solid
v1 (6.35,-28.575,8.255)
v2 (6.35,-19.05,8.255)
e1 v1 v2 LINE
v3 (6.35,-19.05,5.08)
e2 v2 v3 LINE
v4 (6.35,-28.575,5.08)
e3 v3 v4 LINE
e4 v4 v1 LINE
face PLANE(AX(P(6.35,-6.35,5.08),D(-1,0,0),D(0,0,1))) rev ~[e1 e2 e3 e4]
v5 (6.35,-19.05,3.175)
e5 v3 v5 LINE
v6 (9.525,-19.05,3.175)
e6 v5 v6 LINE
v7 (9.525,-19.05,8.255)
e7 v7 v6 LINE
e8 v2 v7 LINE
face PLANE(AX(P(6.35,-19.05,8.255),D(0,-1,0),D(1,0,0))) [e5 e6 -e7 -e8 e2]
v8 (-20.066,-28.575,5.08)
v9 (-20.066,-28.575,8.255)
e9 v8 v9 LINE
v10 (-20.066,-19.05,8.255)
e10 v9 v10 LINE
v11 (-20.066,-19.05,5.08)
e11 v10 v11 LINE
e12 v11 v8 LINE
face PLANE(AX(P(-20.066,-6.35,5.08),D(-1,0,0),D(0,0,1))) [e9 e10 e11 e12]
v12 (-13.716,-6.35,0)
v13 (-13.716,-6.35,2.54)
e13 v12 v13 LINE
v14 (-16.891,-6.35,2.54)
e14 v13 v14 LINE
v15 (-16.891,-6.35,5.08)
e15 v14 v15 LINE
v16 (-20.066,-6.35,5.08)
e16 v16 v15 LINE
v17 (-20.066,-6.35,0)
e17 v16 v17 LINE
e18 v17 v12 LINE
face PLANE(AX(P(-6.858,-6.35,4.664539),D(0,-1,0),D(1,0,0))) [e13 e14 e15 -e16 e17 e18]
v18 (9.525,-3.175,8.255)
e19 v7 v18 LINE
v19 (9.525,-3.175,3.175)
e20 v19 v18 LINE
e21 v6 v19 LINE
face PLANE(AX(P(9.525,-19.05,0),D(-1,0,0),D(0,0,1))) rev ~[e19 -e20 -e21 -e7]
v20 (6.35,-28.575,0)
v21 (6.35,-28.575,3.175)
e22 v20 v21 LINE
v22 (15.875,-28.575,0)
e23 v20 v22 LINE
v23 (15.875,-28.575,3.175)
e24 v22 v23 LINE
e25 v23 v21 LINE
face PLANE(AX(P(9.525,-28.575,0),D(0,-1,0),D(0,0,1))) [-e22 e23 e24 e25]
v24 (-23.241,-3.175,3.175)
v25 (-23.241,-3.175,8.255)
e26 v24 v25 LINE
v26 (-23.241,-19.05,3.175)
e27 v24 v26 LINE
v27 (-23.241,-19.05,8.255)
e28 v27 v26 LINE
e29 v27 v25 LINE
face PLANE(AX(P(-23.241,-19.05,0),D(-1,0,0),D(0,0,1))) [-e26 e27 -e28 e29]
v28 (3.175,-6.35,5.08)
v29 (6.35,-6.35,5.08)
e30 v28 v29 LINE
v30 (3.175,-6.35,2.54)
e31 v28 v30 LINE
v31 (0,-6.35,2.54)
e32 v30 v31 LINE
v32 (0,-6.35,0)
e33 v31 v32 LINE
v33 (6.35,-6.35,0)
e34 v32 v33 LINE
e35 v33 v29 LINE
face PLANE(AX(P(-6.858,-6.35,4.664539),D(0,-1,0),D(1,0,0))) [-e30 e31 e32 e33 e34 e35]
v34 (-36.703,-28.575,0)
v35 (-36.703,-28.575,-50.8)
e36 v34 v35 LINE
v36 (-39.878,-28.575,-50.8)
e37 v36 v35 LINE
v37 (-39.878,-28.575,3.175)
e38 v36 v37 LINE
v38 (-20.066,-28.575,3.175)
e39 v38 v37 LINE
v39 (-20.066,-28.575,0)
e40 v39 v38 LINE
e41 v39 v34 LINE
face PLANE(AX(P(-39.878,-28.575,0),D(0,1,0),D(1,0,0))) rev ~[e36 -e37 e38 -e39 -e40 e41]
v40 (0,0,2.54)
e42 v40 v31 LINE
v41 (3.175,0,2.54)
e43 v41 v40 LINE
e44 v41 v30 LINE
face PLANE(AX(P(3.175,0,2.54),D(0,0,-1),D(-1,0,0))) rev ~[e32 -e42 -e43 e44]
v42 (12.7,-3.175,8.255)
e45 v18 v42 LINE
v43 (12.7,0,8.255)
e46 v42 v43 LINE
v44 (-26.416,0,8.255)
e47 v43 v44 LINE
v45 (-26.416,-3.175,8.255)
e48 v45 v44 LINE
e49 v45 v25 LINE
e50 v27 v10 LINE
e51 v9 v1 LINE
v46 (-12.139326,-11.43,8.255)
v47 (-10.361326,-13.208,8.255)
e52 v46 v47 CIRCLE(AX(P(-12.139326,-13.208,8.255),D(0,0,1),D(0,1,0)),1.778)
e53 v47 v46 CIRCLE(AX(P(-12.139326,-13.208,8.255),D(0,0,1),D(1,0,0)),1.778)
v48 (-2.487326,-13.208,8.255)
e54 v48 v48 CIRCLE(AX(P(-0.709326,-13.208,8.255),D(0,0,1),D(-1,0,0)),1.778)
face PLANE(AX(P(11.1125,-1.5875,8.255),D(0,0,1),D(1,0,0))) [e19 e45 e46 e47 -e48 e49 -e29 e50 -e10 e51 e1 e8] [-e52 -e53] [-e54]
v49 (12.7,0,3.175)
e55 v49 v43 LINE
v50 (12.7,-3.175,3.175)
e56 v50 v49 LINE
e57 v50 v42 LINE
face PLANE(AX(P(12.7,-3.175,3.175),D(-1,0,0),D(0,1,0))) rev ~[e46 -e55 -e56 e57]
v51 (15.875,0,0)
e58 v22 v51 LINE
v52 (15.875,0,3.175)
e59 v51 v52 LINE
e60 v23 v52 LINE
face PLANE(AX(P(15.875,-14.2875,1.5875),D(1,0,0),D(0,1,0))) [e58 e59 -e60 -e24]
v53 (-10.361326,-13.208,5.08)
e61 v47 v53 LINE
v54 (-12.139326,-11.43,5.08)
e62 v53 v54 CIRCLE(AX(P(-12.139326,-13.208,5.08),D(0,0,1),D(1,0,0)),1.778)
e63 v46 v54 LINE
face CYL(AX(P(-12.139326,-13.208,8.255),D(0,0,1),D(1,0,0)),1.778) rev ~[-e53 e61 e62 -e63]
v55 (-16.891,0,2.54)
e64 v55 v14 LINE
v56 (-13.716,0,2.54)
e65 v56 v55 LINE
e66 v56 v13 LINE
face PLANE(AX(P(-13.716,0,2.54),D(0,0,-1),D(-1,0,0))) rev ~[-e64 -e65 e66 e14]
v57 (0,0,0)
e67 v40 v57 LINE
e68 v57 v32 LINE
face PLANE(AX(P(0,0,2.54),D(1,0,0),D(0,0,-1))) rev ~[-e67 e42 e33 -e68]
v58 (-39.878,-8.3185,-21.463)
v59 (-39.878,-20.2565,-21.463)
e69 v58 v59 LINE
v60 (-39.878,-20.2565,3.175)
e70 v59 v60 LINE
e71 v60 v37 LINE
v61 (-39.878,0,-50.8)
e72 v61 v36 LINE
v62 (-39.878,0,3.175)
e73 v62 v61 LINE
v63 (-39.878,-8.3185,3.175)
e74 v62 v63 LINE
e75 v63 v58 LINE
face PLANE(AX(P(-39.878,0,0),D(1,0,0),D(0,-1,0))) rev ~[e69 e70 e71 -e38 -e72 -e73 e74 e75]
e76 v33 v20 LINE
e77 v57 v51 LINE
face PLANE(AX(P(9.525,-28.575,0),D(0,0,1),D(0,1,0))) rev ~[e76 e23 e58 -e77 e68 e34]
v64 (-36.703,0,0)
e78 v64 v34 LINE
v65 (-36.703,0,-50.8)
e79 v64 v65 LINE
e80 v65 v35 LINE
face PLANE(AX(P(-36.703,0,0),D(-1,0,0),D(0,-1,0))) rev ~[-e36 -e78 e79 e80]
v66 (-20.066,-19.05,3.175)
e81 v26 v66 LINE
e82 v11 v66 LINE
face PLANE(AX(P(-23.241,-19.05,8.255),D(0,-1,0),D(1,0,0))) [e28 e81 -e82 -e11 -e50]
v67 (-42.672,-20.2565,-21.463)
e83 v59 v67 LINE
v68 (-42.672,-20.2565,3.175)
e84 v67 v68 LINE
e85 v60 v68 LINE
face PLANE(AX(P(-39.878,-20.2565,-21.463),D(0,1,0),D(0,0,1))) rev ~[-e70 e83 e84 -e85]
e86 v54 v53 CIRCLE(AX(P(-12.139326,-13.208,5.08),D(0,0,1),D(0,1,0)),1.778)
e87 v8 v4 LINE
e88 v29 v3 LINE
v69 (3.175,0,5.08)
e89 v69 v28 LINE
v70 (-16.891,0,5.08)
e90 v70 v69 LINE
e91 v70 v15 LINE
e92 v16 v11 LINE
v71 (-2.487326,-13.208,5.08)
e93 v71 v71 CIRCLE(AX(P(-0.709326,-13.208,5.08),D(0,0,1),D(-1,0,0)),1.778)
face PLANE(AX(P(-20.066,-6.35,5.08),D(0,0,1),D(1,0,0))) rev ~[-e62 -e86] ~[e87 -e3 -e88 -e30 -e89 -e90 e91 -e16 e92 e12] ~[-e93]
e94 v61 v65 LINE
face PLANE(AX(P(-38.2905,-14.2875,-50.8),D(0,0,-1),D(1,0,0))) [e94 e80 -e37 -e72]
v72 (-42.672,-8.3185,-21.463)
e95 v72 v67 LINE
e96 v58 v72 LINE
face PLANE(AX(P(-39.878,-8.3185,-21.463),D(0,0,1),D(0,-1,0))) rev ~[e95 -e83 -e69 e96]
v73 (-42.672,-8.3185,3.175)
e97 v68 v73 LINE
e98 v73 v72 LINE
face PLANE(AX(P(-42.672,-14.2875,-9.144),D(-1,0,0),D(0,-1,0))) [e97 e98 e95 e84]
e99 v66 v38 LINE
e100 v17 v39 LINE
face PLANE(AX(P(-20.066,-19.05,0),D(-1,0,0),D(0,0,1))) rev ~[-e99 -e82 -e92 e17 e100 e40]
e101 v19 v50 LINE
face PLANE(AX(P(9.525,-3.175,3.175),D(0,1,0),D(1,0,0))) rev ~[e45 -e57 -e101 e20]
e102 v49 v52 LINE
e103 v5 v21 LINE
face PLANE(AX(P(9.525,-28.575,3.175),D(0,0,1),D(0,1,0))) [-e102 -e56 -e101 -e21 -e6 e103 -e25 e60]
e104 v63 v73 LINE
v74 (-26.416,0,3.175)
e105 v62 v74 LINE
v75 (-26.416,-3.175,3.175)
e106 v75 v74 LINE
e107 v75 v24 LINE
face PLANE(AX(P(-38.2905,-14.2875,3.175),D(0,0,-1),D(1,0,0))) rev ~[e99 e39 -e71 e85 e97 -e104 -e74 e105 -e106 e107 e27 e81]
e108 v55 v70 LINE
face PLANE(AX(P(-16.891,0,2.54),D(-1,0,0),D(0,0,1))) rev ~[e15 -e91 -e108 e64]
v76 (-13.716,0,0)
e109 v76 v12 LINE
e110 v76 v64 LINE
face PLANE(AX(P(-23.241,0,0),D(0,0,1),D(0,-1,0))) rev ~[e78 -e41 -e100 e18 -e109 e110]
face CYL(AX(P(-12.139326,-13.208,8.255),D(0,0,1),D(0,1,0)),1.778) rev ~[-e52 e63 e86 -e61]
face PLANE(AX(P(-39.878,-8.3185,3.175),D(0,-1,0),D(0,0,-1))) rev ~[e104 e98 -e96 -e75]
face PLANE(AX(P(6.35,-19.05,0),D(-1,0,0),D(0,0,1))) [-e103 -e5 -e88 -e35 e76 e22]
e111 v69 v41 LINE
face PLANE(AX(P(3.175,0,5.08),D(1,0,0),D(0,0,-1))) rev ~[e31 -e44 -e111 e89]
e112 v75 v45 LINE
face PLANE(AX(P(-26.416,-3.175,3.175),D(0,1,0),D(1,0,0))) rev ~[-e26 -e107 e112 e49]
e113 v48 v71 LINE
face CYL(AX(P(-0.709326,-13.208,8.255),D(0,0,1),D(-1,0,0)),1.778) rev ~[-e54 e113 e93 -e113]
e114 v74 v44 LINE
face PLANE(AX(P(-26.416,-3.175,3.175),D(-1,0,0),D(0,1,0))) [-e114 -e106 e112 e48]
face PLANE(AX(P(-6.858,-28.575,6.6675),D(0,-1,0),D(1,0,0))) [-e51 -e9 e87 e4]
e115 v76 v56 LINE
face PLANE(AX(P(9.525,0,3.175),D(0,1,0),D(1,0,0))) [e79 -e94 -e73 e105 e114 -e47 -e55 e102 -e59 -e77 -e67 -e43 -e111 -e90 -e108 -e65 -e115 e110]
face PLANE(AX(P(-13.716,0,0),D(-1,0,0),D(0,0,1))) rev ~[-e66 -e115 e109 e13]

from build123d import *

# Parameters (mm, degrees)
F1_DEPTH       = 6.35
F2_W           = 26.416
F2_H           = 3.175
F3_DEPTH       = 22.225
F4_W           = 3.175
F4_H           = 19.05
F5_DEPTH       = 8.255
F6_W           = 3.175
F6_H           = 3.175
F7_DEPTH       = 9.525
F8_W           = 3.175
F8_H           = 3.175
F9_DEPTH       = 9.525
F10_W          = 28.575
F10_H          = 3.175
F11_DEPTH      = 13.462
F12_W          = 3.175
F12_H          = 28.575
F13_DEPTH      = 50.8
F13_DEPTH_BACK = 3.175
F15_DEPTH      = 2.794
F17_DEPTH      = 25.4
F18_W          = 3.175
F18_H          = 3.175
F19_DEPTH      = 5.08
F20_W          = 28.575
F20_H          = 3.175
F21_DEPTH      = 6.35
F22_W          = 3.175
F22_H          = 3.175
F23_DEPTH      = 5.08


with BuildPart() as f1:
    # F0 (on Front) → F1 (new body)
    with BuildSketch(Plane.XZ):
        Polygon((0, 2.54), (0, 0), (3.175, 0), (6.35, 0), (6.35, 5.08), (6.35, 8.255), (-20.066, 8.255), (-20.066, 5.08), (-20.066, 0), (-16.891, 0), (-13.716, 0), (-13.716, 2.54), (-16.891, 2.54), (-16.891, 5.08), (3.175, 5.08), (3.175, 2.54), align=None)
    extrude(amount=F1_DEPTH)

    # F2 (on face) → F3 (join)
    with BuildSketch(Plane.XZ.offset(6.35)):
        with Locations((-6.858, 6.6675)):
            Rectangle(F2_W, F2_H)
    extrude(amount=F3_DEPTH)

    # F4 (on face) → F5 (join, through all)
    with BuildSketch(Plane.XY.offset(8.255)):
        with Locations((-21.6535, -9.525)):
            Rectangle(F4_W, F4_H)
        with Locations((7.9375, -9.525)):
            Rectangle(F4_W, F4_H)
    extrude(amount=-F5_DEPTH)

    # F6 (on face) → F7 (join, through all)
    with BuildSketch(Plane.XZ.offset(19.05)):
        with Locations((-21.6535, 1.5875)):
            Rectangle(F6_W, F6_H)
    extrude(amount=F7_DEPTH)

    # F8 (on face) → F9 (join, through all)
    with BuildSketch(Plane.XZ.offset(19.05)):
        with Locations((7.9375, 1.5875)):
            Rectangle(F8_W, F8_H)
    extrude(amount=F9_DEPTH)

    # F10 (on face) → F11 (join)
    with BuildSketch(Plane(origin=(-23.241, 0, 0), x_dir=(0, -1, 0), z_dir=(-1, 0, 0))):
        with Locations((14.2875, 1.5875)):
            Rectangle(F10_W, F10_H)
    extrude(amount=F11_DEPTH)

    # F12 (on face) → F13 (join, two sides)
    with BuildSketch(Plane(origin=(0, 0, 0), x_dir=(1, 0, 0), z_dir=(0, 0, -1))) as f13_sk:
        with Locations((-38.2905, 14.2875)):
            Rectangle(F12_W, F12_H)
    extrude(amount=F13_DEPTH)
    extrude(f13_sk.sketch, amount=-F13_DEPTH_BACK)

    # F14 (on face) → F15 (join)
    with BuildSketch(Plane(origin=(-39.878, 0, 0), x_dir=(0, -1, 0), z_dir=(-1, 0, 0))):
        Polygon((20.2565, 3.175), (14.2875, 3.175), (8.3185, 3.175), (8.3185, -21.463), (20.2565, -21.463), align=None)
    extrude(amount=F15_DEPTH)

    # F16 (on face) → F17 (cut)
    with BuildSketch(Plane.XY.offset(8.255)):
        with BuildLine():
            ThreePointArc((-10.361326316, -13.208), (-10.882090459, -11.9507641431), (-12.139326316, -11.43))
            Line((-12.139326316, -11.43), (-12.139326316, -13.208))
            Line((-12.139326316, -13.208), (-10.361326316, -13.208))
        make_face()
        with BuildLine():
            ThreePointArc((1.068673684, -13.208), (-0.709326316, -11.43), (-2.487326316, -13.208))
            ThreePointArc((-2.487326316, -13.208), (-0.709326316, -14.986), (1.068673684, -13.208))
        make_face()
        with BuildLine():
            Line((-12.139326316, -13.208), (-12.139326316, -11.43))
            ThreePointArc((-12.139326316, -11.43), (-13.3965621729, -14.4652358569), (-10.361326316, -13.208))
            Line((-10.361326316, -13.208), (-12.139326316, -13.208))
        make_face()
    extrude(amount=-F17_DEPTH, mode=Mode.SUBTRACT)

    # F18 (on face) → F19 (join, through all)
    with BuildSketch(Plane.XY.offset(3.175)):
        with Locations((-24.8285, -1.5875)):
            Rectangle(F18_W, F18_H)
    extrude(amount=F19_DEPTH)

    # F20 (on face) → F21 (join)
    with BuildSketch(Plane.YZ.offset(9.525)):
        with Locations((-14.2875, 1.5875)):
            Rectangle(F20_W, F20_H)
    extrude(amount=F21_DEPTH)

    # F22 (on face) → F23 (join, through all)
    with BuildSketch(Plane.XY.offset(3.175)):
        with Locations((11.1125, -1.5875)):
            Rectangle(F22_W, F22_H)
    extrude(amount=F23_DEPTH)


solid = f1.part
